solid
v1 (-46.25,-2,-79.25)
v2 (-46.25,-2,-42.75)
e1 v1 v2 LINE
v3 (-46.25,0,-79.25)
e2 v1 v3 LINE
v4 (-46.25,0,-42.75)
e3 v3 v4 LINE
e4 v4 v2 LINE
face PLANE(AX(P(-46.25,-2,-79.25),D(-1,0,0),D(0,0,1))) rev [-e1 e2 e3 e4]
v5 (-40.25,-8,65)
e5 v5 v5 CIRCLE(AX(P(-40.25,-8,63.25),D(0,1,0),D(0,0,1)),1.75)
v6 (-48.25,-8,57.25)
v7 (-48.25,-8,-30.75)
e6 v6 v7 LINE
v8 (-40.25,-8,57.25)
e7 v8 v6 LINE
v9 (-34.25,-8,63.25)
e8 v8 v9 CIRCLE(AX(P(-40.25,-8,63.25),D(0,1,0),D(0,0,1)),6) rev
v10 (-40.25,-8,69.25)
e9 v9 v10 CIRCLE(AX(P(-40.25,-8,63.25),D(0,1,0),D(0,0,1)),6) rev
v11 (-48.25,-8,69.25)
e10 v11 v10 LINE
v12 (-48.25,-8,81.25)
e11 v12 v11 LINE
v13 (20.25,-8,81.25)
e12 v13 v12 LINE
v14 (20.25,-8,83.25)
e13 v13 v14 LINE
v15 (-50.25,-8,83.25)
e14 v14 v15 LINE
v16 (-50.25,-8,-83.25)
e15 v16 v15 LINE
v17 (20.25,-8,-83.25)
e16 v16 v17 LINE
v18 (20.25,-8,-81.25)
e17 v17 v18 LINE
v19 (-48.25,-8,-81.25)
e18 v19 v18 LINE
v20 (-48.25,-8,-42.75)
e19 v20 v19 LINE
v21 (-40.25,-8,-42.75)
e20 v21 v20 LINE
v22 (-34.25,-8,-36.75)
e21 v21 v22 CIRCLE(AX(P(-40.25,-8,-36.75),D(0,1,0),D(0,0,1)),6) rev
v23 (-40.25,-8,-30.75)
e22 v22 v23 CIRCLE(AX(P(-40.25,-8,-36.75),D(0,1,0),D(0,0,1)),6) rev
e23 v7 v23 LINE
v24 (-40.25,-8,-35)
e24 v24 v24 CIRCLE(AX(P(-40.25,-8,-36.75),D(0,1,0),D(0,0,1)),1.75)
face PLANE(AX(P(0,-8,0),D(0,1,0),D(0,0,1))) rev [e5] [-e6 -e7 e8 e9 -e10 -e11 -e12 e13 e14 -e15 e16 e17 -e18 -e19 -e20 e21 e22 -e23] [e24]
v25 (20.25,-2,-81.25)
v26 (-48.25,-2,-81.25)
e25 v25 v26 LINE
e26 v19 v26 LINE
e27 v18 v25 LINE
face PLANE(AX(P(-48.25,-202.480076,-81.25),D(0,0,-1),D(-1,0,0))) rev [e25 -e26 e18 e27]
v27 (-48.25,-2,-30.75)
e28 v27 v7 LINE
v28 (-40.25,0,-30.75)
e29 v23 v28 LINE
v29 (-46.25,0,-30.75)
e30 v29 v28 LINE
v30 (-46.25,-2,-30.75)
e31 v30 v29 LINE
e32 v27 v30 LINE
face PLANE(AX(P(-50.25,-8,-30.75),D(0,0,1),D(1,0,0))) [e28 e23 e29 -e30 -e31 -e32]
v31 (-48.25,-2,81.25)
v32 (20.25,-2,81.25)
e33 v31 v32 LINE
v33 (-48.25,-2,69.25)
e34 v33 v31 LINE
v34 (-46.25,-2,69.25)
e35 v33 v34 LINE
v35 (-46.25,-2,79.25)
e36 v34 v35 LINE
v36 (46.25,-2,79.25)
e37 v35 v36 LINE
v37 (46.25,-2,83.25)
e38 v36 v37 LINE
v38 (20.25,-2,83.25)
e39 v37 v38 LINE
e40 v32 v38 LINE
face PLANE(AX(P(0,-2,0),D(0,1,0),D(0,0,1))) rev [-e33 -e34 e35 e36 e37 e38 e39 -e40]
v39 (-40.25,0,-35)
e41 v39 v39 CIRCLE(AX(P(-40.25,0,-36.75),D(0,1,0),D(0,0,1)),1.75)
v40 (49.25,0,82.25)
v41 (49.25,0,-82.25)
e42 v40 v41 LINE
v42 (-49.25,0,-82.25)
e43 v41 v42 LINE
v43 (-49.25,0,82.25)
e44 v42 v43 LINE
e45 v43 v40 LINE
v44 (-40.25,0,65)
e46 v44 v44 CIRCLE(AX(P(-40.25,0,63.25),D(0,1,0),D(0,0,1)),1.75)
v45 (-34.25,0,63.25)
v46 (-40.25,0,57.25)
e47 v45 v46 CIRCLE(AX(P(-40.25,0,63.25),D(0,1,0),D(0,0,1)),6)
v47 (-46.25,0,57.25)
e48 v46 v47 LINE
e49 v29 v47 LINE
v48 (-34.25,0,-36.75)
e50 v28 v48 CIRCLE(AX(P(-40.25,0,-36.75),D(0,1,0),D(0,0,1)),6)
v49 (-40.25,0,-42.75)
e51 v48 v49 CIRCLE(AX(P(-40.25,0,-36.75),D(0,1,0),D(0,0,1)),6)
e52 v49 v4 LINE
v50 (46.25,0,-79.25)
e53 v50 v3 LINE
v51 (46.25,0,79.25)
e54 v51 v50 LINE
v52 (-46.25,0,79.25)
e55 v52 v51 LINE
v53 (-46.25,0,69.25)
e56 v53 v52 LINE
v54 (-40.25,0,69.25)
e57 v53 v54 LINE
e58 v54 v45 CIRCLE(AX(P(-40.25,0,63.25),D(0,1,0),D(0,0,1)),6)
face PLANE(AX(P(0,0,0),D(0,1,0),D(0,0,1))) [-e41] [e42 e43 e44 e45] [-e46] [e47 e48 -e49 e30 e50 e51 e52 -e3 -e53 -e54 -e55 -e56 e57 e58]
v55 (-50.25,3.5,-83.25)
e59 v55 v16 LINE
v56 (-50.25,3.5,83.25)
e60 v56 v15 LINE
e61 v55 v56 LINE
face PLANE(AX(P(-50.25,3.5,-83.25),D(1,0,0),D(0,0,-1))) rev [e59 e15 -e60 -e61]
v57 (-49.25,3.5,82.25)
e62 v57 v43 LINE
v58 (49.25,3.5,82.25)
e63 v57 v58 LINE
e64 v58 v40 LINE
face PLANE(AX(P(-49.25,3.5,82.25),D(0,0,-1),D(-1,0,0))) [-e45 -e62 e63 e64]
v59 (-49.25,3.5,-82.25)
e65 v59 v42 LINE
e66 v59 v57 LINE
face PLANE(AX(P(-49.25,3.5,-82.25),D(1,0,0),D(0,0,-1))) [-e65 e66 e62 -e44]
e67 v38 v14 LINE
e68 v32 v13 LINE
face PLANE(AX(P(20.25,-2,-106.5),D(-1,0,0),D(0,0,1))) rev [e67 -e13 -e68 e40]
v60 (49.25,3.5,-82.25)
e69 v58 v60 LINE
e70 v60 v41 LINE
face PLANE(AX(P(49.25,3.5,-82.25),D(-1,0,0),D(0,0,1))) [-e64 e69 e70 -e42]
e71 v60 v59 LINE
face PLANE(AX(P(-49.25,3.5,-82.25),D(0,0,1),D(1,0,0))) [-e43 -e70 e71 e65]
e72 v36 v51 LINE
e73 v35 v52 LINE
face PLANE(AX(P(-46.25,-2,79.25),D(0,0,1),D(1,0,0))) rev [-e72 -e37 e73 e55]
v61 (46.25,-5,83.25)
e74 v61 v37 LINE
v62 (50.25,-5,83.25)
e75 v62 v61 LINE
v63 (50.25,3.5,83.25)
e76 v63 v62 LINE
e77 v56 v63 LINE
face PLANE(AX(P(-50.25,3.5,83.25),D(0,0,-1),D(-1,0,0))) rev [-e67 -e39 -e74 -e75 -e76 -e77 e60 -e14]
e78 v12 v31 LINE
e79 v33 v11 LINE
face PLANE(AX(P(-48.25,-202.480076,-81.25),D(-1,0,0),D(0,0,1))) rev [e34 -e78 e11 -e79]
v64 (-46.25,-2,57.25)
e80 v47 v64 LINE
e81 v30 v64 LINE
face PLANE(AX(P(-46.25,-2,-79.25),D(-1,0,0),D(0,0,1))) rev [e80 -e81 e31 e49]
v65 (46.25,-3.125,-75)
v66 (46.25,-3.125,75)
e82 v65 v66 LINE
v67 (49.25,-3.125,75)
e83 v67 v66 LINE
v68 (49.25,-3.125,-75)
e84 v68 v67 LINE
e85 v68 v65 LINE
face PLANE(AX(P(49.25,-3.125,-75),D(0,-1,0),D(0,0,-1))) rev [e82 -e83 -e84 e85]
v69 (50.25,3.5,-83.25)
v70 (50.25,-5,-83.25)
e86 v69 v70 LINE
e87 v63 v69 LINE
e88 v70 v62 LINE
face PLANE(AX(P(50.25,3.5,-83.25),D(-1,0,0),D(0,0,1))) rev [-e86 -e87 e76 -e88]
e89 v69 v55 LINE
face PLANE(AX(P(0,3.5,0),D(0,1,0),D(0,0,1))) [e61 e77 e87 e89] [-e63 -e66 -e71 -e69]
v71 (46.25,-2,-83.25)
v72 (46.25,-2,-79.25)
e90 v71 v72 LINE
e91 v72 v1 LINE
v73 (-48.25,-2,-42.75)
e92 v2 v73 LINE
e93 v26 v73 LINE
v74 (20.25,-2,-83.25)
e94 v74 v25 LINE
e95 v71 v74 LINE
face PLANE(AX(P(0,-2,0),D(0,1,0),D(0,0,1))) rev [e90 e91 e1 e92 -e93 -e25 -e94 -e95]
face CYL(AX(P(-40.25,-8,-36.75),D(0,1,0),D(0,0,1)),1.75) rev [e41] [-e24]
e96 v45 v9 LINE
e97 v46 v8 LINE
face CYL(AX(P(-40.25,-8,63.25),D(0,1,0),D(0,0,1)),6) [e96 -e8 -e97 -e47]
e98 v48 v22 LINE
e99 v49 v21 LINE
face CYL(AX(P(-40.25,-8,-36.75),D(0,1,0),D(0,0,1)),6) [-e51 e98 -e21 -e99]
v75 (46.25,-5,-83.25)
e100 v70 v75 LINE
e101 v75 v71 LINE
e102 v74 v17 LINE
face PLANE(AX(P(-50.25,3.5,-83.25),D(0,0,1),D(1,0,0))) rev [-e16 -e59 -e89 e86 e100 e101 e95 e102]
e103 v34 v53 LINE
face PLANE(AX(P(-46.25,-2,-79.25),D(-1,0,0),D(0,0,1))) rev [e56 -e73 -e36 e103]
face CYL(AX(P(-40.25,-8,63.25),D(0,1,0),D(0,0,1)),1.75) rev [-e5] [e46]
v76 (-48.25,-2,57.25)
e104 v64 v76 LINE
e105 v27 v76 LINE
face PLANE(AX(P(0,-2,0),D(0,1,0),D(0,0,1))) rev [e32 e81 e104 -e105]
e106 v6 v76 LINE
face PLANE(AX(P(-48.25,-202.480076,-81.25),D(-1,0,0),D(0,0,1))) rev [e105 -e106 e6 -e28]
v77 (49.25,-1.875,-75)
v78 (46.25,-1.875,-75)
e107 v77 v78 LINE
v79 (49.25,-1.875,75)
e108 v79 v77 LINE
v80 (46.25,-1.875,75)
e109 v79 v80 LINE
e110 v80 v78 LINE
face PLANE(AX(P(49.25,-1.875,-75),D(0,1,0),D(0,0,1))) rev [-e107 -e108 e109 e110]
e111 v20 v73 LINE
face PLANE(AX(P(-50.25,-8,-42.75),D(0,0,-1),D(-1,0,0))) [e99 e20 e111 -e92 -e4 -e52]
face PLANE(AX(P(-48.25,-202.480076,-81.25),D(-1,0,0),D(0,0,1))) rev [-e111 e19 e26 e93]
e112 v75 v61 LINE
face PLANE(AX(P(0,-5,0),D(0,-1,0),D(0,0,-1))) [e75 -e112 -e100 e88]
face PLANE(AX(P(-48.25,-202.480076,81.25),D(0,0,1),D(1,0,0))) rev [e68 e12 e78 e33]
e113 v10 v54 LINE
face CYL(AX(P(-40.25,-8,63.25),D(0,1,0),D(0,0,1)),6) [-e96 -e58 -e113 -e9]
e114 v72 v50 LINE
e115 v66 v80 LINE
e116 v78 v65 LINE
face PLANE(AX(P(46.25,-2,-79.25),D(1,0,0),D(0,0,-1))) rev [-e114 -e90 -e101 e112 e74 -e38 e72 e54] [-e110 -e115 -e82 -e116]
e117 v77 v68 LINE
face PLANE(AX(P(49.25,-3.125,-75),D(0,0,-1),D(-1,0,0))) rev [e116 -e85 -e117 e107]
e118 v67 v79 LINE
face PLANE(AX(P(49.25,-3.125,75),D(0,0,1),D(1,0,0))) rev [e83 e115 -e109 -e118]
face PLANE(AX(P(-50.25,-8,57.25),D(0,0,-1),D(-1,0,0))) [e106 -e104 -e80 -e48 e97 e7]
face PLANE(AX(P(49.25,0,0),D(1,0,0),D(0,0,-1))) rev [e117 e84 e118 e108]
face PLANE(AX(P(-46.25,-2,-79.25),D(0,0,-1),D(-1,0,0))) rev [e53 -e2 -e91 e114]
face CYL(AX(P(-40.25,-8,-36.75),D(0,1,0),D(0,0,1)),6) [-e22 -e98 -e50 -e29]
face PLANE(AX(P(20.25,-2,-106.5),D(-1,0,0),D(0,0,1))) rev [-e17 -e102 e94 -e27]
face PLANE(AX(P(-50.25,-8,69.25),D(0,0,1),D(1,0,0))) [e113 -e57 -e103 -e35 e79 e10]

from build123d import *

# Parameters (mm, degrees)
SKETCH2_W                                      = 100.5
SKETCH2_H                                      = 166.5
SKETCH2_W_2                                    = 98.5
SKETCH2_H_2                                    = 164.5
DIAPLAY_RING_DEPTH                             = 3.5
SKETCH3_W                                      = 100.5
SKETCH3_H                                      = 166.5
SKETCH3_W_2                                    = 92.5
SKETCH3_H_2                                    = 158.5
DISPLAY_LIP_DEPTH                              = 2
SKETCH4_W                                      = 16
SKETCH4_H                                      = 12
SKETCH4_R                                      = 1.75
DISPLAY_MOUNTING_TABS_DEPTH                    = 8
FILLET1_R                                      = 6
SKETCH7_W                                      = 100.5
SKETCH7_H                                      = 166.5
SKETCH7_W_2                                    = 96.5
SKETCH7_H_2                                    = 162.5
PERIMETER_EXTENSION_FOR_STRUCTURE_DEPTH        = 7
PERIMETER_EXTENSION_FOR_CAR_TRIM_DEPTH         = 2
SKETCH9_W                                      = 4
SKETCH9_H                                      = 166.5
MATERIAL_ADDITION_FOR_DISPLAY_MOUNTING_S_DEPTH = 4
SKETCH10_W                                     = 150
SKETCH10_H                                     = 1.25
DISPLAY_MOUNTING_SLOT_DEPTH                    = 3
SKETCH6_R                                      = 1.75
SHIFTER_SCREW_IF_DEPTH                         = 3
CUT_EXTRUDE2_DEPTH                             = 137.888640873
CUT_EXTRUDE2_DEPTH_BACK                        = 137.888640873


with BuildPart() as part:
    # Sketch2 → DIAPLAY RING (new body)
    with BuildSketch(Plane(origin=(0, 0, 0), x_dir=(1, 0, 0), z_dir=(0, 1, 0))):
        Rectangle(SKETCH2_W, SKETCH2_H)
        Rectangle(SKETCH2_W_2, SKETCH2_H_2, mode=Mode.SUBTRACT)
    extrude(amount=DIAPLAY_RING_DEPTH)

    # Sketch3 → DISPLAY LIP (add)
    with BuildSketch(Plane(origin=(0, 0, 0), x_dir=(1, 0, 0), z_dir=(0, 1, 0))):
        Rectangle(SKETCH3_W, SKETCH3_H)
        Rectangle(SKETCH3_W_2, SKETCH3_H_2, mode=Mode.SUBTRACT)
    extrude(amount=-DISPLAY_LIP_DEPTH)

    # Sketch4 → DISPLAY MOUNTING TABS (add)
    # profile 1 of 2: a face of its own
    with BuildSketch(Plane(origin=(0, 0, 0), x_dir=(1, 0, 0), z_dir=(0, 1, 0))):
        with Locations((-42.25, -63.25)):
            Rectangle(SKETCH4_W, SKETCH4_H)
        with Locations(Location((-40.25, -63.25, 0), (0, 0, 270))):
            Circle(SKETCH4_R, mode=Mode.SUBTRACT)
    # profile 2 of 2: a face of its own
    with BuildSketch(Plane(origin=(0, 0, 0), x_dir=(1, 0, 0), z_dir=(0, 1, 0))):
        with Locations((-42.25, 36.75)):
            Rectangle(SKETCH4_W, SKETCH4_H)
        with Locations(Location((-40.25, 36.75, 0), (0, 0, 270))):
            Circle(SKETCH4_R, mode=Mode.SUBTRACT)
    extrude(amount=-DISPLAY_MOUNTING_TABS_DEPTH)

    # Fillet1
    fillet1_edges = [part.edges().sort_by_distance(p)[0] for p in [
        (-34.25, -4, 57.25),
        (-34.25, -4, 69.25),
        (-34.25, -4, -42.75),
        (-34.25, -4, -30.75),
    ]]
    fillet(fillet1_edges, radius=FILLET1_R - 0.0001)  # a hair under: the kernel refuses the full size

    # Sketch7 → PERIMETER EXTENSION FOR STRUCTURE (add)
    with BuildSketch(Plane(origin=(0, -1, 0), x_dir=(1, 0, 0), z_dir=(0, 1, 0))):
        Rectangle(SKETCH7_W, SKETCH7_H)
        Rectangle(SKETCH7_W_2, SKETCH7_H_2, mode=Mode.SUBTRACT)
    extrude(amount=-PERIMETER_EXTENSION_FOR_STRUCTURE_DEPTH)

    # Sketch8 → PERIMETER EXTENSION FOR CAR TRIM (add)
    with BuildSketch(Plane.XZ.offset(8)):
        Polygon((25.25, 83.25), (50.25, 83.25), (50.25, -83.25), (25.25, -83.25), (25.25, -81.25), (48.25, -81.25), (48.25, 81.25), (25.25, 81.25), align=None)
    extrude(amount=PERIMETER_EXTENSION_FOR_CAR_TRIM_DEPTH)

    # Sketch9 → MATERIAL ADDITION FOR DISPLAY MOUNTING SLOT (add)
    with BuildSketch(Plane(origin=(0, -1, 0), x_dir=(1, 0, 0), z_dir=(0, 1, 0))):
        with Locations((48.25, 0)):
            Rectangle(SKETCH9_W, SKETCH9_H)
    extrude(amount=-MATERIAL_ADDITION_FOR_DISPLAY_MOUNTING_S_DEPTH)

    # Sketch10 → DISPLAY MOUNTING SLOT (cut)
    with BuildSketch(Plane.ZY.offset(-46.25)):
        with Locations((0, -2.5)):
            Rectangle(SKETCH10_W, SKETCH10_H)
    extrude(amount=-DISPLAY_MOUNTING_SLOT_DEPTH, mode=Mode.SUBTRACT)

    # Sketch11 → Cut-Extrude2 (cut, two sides: drawn at the far end of the back side and taken through both)
    with BuildSketch(Plane.XY.offset(-CUT_EXTRUDE2_DEPTH_BACK)):
        Polygon((50.25, -10), (50.25, -5), (46.25, -5), (46.25, -2), (20.25, -2), (20.25, -10), align=None)
    extrude(amount=CUT_EXTRUDE2_DEPTH + CUT_EXTRUDE2_DEPTH_BACK, mode=Mode.SUBTRACT)


with BuildPart() as body_2:
    # Sketch6 → SHIFTER SCREW IF (new body)
    with BuildSketch(Plane(origin=(0, -55, 0), x_dir=(1, 0, 0), z_dir=(0, 1, 0))):
        with BuildLine():
            Line((-50, 106.5), (12, 106.5))
            ThreePointArc((12, 106.5), (25.5, 93), (12, 79.5))
            Line((12, 79.5), (-50, 79.5))
            ThreePointArc((-50, 79.5), (-63.5, 93), (-50, 106.5))
        make_face()
        with Locations(Location((-50, 93, 0), (0, 0, 270))):
            Circle(SKETCH6_R, mode=Mode.SUBTRACT)
        with Locations(Location((12, 93, 0), (0, 0, 270))):
            Circle(SKETCH6_R, mode=Mode.SUBTRACT)
    extrude(amount=-SHIFTER_SCREW_IF_DEPTH)


solid = part.part
